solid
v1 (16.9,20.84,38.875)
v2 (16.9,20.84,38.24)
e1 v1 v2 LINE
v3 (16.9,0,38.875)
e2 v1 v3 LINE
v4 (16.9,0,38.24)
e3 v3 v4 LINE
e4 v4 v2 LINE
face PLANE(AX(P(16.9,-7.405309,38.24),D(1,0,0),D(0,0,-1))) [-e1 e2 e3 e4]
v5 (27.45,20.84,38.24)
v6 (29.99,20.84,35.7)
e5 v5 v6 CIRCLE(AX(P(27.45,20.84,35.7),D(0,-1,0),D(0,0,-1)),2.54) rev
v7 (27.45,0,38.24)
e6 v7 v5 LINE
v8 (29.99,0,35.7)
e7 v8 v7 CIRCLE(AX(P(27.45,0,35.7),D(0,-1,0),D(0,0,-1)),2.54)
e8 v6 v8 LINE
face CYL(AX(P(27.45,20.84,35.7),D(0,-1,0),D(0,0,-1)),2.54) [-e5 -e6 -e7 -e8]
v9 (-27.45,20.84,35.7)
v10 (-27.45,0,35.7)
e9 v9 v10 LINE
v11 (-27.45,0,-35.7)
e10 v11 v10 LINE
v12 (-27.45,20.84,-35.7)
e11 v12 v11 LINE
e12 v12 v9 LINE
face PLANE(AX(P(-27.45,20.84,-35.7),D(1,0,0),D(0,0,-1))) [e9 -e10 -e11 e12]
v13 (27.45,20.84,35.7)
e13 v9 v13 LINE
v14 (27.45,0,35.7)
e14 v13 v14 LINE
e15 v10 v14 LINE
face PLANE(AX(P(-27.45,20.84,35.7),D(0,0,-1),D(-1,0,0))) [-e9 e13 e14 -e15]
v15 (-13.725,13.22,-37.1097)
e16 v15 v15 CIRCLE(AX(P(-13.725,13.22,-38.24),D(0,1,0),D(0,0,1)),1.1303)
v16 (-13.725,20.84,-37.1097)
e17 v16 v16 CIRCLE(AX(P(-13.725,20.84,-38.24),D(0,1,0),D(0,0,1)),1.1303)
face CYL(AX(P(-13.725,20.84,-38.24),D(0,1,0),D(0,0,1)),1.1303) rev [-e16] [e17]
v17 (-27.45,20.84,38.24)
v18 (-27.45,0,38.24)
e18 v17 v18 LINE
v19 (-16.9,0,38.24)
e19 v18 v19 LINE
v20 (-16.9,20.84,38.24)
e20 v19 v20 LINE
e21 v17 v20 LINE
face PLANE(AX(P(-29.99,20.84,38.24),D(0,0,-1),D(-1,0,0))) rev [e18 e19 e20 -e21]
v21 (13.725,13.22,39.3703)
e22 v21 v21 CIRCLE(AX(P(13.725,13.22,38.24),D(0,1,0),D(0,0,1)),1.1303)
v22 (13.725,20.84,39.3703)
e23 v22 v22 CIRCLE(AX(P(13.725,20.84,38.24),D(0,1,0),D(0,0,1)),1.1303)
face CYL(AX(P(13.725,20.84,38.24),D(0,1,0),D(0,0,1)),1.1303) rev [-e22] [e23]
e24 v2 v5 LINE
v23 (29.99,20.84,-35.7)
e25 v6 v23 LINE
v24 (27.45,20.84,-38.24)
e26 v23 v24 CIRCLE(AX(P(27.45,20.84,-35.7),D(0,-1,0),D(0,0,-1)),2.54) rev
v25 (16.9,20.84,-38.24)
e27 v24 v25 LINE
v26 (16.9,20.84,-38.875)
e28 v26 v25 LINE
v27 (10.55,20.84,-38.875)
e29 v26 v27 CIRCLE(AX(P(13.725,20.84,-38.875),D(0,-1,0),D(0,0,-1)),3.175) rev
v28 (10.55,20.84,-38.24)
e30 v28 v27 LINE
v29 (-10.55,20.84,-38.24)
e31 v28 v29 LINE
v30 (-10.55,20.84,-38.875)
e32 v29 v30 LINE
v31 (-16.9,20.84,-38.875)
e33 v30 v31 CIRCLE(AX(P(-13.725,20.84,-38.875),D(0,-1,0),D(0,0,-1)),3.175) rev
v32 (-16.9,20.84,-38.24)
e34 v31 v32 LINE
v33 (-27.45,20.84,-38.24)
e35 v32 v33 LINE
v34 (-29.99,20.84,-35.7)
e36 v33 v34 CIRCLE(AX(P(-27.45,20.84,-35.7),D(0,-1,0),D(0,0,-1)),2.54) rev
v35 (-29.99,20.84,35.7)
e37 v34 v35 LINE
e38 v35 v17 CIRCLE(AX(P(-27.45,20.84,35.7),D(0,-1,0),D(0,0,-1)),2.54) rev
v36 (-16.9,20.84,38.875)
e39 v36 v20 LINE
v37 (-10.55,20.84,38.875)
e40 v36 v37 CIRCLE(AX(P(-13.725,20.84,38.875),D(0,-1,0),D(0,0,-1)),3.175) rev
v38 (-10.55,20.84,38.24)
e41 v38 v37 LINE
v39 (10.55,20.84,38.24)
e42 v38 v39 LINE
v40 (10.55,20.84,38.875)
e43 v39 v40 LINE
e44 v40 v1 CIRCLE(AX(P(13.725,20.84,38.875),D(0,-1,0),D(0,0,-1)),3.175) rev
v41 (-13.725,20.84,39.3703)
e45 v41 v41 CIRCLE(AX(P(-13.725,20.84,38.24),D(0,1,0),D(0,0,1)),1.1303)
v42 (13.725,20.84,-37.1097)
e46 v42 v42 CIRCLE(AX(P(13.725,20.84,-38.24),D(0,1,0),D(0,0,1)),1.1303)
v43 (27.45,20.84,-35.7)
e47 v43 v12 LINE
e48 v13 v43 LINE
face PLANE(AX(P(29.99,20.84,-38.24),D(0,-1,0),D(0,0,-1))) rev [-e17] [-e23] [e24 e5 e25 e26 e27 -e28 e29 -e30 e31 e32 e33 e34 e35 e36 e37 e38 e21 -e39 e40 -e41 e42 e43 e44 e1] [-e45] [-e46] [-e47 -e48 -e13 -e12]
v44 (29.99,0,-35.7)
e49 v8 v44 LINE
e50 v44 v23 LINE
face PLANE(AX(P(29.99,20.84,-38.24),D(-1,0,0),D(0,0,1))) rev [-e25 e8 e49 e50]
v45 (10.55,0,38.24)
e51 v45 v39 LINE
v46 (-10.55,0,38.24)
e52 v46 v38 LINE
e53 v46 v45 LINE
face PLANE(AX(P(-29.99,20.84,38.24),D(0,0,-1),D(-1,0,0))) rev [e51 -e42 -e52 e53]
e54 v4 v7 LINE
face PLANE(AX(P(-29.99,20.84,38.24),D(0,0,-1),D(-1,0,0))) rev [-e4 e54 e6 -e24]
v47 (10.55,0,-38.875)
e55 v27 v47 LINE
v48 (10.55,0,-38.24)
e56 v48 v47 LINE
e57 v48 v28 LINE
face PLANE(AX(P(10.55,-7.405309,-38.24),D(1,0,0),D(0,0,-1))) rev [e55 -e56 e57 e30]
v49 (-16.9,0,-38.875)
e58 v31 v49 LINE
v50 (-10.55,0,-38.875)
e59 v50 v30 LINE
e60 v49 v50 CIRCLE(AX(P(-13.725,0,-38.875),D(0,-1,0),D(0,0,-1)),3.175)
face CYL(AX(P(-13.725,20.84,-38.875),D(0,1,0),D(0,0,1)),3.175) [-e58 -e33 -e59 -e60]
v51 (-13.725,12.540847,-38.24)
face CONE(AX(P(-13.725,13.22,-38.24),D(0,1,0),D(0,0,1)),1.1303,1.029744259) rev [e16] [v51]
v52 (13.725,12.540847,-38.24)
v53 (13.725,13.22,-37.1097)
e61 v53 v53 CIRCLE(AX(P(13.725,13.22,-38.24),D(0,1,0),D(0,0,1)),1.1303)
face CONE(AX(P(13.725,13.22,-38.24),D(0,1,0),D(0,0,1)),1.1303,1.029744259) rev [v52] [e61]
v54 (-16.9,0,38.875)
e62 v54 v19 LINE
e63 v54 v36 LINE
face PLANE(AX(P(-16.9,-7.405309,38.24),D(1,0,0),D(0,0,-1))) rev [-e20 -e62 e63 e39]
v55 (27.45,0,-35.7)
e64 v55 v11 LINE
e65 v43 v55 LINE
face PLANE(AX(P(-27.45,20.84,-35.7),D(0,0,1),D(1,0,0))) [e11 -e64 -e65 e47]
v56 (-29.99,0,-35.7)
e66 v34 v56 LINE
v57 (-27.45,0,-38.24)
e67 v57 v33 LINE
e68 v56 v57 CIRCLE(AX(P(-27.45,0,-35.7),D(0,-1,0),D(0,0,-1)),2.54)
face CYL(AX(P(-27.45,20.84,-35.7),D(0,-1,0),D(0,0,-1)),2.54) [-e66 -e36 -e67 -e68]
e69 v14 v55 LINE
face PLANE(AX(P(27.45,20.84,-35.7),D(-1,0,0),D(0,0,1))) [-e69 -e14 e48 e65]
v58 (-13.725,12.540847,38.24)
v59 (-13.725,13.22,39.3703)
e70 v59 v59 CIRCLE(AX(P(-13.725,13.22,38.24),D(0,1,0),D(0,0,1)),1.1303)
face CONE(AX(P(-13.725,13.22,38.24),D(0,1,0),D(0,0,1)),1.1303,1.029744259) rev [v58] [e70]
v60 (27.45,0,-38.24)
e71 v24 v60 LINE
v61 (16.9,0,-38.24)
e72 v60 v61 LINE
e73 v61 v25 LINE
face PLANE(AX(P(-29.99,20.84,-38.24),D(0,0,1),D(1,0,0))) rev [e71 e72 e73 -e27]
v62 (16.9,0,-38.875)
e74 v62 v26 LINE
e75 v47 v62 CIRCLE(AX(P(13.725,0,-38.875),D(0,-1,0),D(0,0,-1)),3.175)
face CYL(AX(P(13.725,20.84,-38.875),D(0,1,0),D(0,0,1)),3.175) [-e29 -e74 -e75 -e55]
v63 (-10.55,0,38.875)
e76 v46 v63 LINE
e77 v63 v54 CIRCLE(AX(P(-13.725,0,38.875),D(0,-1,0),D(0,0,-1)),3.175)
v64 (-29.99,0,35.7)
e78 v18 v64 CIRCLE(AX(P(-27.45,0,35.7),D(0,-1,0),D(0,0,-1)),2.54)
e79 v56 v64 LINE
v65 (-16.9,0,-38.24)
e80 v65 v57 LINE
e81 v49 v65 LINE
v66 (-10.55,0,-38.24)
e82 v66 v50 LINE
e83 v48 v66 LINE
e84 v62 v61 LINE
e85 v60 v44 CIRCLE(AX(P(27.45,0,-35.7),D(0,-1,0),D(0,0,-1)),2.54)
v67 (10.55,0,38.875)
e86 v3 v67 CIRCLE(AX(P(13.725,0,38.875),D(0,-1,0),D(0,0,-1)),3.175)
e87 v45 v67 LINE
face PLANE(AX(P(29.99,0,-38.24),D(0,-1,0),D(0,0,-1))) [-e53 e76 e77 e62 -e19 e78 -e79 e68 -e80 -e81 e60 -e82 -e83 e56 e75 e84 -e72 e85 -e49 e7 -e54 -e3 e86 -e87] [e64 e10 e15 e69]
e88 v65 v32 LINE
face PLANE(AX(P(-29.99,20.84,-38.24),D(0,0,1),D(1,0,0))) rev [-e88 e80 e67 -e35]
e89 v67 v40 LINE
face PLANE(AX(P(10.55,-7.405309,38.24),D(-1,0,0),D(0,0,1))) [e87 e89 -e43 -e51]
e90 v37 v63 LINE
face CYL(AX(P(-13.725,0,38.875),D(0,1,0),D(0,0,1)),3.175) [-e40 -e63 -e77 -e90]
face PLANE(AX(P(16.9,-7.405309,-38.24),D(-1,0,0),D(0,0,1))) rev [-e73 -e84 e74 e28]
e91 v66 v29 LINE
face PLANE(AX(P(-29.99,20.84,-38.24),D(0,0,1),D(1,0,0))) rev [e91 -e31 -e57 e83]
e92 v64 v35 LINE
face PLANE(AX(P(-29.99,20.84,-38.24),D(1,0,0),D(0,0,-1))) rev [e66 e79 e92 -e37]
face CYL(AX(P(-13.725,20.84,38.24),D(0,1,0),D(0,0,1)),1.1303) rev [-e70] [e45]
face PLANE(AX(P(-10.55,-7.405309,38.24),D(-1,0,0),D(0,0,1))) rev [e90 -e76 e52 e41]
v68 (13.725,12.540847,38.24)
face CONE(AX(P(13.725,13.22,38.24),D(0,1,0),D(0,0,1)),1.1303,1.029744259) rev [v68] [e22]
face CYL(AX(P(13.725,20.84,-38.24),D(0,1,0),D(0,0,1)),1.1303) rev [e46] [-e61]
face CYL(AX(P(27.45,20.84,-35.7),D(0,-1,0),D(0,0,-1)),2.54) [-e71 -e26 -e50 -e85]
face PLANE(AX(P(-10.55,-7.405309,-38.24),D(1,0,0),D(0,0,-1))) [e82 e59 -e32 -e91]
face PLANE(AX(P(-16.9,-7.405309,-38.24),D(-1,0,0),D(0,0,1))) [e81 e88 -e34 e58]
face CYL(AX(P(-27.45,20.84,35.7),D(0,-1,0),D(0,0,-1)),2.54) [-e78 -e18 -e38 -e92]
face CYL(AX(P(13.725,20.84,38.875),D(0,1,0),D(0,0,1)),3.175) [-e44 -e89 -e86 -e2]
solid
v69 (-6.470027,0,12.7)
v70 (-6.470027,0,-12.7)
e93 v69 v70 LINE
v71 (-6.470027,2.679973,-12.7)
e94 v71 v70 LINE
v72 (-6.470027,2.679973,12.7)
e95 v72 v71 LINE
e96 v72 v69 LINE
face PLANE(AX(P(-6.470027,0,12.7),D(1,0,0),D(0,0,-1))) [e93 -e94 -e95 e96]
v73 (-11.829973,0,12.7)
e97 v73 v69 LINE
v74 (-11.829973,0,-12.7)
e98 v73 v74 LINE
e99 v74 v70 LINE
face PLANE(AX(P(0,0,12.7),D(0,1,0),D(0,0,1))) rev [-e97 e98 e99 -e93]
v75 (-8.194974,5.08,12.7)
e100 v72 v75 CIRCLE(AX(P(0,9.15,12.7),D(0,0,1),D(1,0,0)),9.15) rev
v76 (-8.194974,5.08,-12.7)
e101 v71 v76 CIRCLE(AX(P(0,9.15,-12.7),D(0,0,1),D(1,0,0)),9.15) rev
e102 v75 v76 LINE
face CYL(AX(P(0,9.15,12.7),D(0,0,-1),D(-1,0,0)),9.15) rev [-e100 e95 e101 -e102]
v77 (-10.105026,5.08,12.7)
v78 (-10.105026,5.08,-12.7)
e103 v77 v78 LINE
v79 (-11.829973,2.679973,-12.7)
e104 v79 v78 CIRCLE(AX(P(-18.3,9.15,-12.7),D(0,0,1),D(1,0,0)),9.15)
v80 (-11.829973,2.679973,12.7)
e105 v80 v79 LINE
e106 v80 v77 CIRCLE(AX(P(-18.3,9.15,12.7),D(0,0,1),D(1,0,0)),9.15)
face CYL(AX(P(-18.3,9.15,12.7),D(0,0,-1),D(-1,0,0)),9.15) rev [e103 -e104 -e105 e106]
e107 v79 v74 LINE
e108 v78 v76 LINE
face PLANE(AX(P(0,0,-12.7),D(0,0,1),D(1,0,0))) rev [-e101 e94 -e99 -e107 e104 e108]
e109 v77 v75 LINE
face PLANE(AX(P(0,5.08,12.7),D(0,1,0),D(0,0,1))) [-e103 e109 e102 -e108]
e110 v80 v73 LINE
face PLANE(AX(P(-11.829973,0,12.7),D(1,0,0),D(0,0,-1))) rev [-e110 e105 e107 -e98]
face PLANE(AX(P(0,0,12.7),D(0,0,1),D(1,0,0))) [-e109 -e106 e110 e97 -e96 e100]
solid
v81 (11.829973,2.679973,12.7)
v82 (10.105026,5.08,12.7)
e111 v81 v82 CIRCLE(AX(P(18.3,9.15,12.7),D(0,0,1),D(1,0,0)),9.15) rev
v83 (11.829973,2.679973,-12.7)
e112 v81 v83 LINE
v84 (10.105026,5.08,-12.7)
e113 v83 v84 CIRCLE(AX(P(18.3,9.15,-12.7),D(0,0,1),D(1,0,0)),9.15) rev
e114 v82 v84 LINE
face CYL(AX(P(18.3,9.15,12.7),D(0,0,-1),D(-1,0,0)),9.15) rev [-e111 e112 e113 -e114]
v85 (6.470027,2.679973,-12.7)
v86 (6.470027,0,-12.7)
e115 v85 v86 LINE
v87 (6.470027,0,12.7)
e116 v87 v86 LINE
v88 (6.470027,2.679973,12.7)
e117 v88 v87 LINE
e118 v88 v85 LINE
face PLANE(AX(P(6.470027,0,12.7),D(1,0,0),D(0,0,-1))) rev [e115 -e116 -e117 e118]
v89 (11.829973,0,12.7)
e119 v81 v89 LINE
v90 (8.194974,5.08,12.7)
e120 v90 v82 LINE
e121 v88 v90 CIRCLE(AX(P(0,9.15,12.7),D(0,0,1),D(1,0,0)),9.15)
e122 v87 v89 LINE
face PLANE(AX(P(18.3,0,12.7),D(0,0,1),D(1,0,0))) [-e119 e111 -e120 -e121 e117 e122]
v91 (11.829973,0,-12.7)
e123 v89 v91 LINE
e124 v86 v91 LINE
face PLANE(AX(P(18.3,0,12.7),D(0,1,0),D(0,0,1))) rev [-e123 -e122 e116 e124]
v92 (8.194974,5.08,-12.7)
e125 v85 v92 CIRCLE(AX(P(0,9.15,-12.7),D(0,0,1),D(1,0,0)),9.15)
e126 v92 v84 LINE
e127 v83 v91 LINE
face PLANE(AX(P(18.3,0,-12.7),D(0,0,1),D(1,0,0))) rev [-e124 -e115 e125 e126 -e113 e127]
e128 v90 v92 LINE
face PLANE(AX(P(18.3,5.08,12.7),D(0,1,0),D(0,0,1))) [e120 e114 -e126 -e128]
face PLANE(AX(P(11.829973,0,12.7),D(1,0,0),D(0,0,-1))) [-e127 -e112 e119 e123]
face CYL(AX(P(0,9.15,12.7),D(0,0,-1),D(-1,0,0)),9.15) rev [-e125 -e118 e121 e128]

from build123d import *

# Parameters (mm, degrees)
BOSS_EXTRUDE1_OUTLINE_W        = 59.98
BOSS_EXTRUDE1_OUTLINE_H        = 76.48
BOSS_EXTRUDE1_OUTLINE_W_2      = 54.9
BOSS_EXTRUDE1_OUTLINE_H_2      = 71.4
BOSS_EXTRUDE1_DEPTH            = 20.839999976
BOSS_EXTRUDE2_DEPTH            = 12.7
LPATTERN2_COUNT                = 2
LPATTERN2_PITCH                = 18.3
SKETCH6_W                      = 6.35
SKETCH6_H                      = 3.81
BOSS_EXTRUDE3_DEPTH            = 20.839999976
MIRROR2_COPY_1_SKETCH_W        = 6.35
MIRROR2_COPY_1_SKETCH_H        = 3.81
MIRROR2_COPY_1_DEPTH           = 20.839999976
F_4_40_TAPPED_HOLE1_AT_2_COUNT = 2
F_4_40_TAPPED_HOLE1_AT_2_PITCH = 27.45
F_4_40_TAPPED_HOLE1_AT_3_COUNT = 2
F_4_40_TAPPED_HOLE1_AT_3_PITCH = 81.25695601
F_4_40_TAPPED_HOLE1_AT_4_COUNT = 2
F_4_40_TAPPED_HOLE1_AT_4_PITCH = 76.48
FILLET1_RADIUS                 = 3.175
FILLET1_LENGTH                 = 20.839999976
FILLET2_RADIUS                 = 3.175
FILLET2_LENGTH                 = 20.839999976
FILLET3_RADIUS                 = 3.175
FILLET3_LENGTH                 = 20.839999976
FILLET4_RADIUS                 = 3.175
FILLET4_LENGTH                 = 20.839999976
FILLET5_R                      = 2.54


# Read off the part's stored shape, not the designer's step: Boss-Extrude1
with BuildPart() as part:
    # Boss-Extrude1 outline → Boss-Extrude1 (new body)
    with BuildSketch(Plane(origin=(0, 0, 0), x_dir=(1, 0, 0), z_dir=(0, 1, 0))):
        Rectangle(BOSS_EXTRUDE1_OUTLINE_W, BOSS_EXTRUDE1_OUTLINE_H)
        Rectangle(BOSS_EXTRUDE1_OUTLINE_W_2, BOSS_EXTRUDE1_OUTLINE_H_2, mode=Mode.SUBTRACT)
    extrude(amount=BOSS_EXTRUDE1_DEPTH)

    # Sketch6 → Boss-Extrude3 (add)
    with BuildSketch(Plane(origin=(0, 20.839999976, 0), x_dir=(1, 0, 0), z_dir=(0, 1, 0))):
        with Locations((-13.725, 40.145)):
            Rectangle(SKETCH6_W, SKETCH6_H)
    boss_extrude3 = extrude(amount=-BOSS_EXTRUDE3_DEPTH)

    # Mirror1: Boss-Extrude3 across plane
    add(boss_extrude3.mirror(Plane(origin=(0, 0, 0), x_dir=(0, 0, 1), z_dir=(1, 0, 0))))

    # Mirror2: Boss-Extrude3 across plane
    add(boss_extrude3.mirror(Plane.XY))

    # Mirror2 copy 1 sketch → Mirror2 copy 1 (add)
    with BuildSketch(Plane(origin=(0, 20.839999976, 0), x_dir=(-1, 0, 0), z_dir=(0, 1, 0))):
        with Locations((-13.725, 40.145)):
            Rectangle(MIRROR2_COPY_1_SKETCH_W, MIRROR2_COPY_1_SKETCH_H)
    extrude(amount=-MIRROR2_COPY_1_DEPTH)

    # Sketch7 → #4-40 Tapped Hole1 (revolve, cut)
    with BuildSketch(Plane(origin=(-13.725, 20.839999976, -38.24), x_dir=(0, 0, 1), z_dir=(1, 0, 0))):
        Polygon((0, 0), (0, 8.299152758), (1.1303, 7.62), (1.1303, 0), align=None)
    f_4_40_tapped_hole1 = revolve(axis=Axis((-13.725, 27.189999976, -38.24), (0, -1, 0)), mode=Mode.SUBTRACT)

    # #4-40 Tapped Hole1 at 2: #4-40 Tapped Hole1 ×2
    with Locations(*[(i * F_4_40_TAPPED_HOLE1_AT_2_PITCH, 0, 0) for i in range(1, F_4_40_TAPPED_HOLE1_AT_2_COUNT)]):
        add(f_4_40_tapped_hole1, mode=Mode.SUBTRACT)

    # #4-40 Tapped Hole1 at 3: #4-40 Tapped Hole1 ×2
    with Locations(*[Vector(0.3378172324920079, 0, 0.9412117282691715) * (i * F_4_40_TAPPED_HOLE1_AT_3_PITCH) for i in range(1, F_4_40_TAPPED_HOLE1_AT_3_COUNT)]):
        add(f_4_40_tapped_hole1, mode=Mode.SUBTRACT)

    # #4-40 Tapped Hole1 at 4: #4-40 Tapped Hole1 ×2
    with Locations(*[(0, 0, i * F_4_40_TAPPED_HOLE1_AT_4_PITCH) for i in range(1, F_4_40_TAPPED_HOLE1_AT_4_COUNT)]):
        add(f_4_40_tapped_hole1, mode=Mode.SUBTRACT)

    # Fillet1: full round fillet: the end face becomes a half cylinder, R = half its width
    fillet1_face = Plane((-13.725, 10.419999988, -42.05), x_dir=(0, -1, 0), z_dir=(0, 0, -1))  # on the end face: x along it, z out of the body
    fillet1_slab = fillet1_face.offset(-FILLET1_RADIUS / 2) * Box(FILLET1_LENGTH, 2 * FILLET1_RADIUS, FILLET1_RADIUS, mode=Mode.PRIVATE)  # the body's end, R deep
    fillet1_round = Plane((-13.725, 10.419999988, -38.875), x_dir=(0, 0, -1), z_dir=(0, -1, 0)) * Cylinder(FILLET1_RADIUS, FILLET1_LENGTH, mode=Mode.PRIVATE)  # its axis R under the face
    add(fillet1_slab - fillet1_round, mode=Mode.SUBTRACT)

    # Fillet2: full round fillet: the end face becomes a half cylinder, R = half its width
    fillet2_face = Plane((13.725, 10.419999988, -42.05), x_dir=(0, -1, 0), z_dir=(0, 0, -1))  # on the end face: x along it, z out of the body
    fillet2_slab = fillet2_face.offset(-FILLET2_RADIUS / 2) * Box(FILLET2_LENGTH, 2 * FILLET2_RADIUS, FILLET2_RADIUS, mode=Mode.PRIVATE)  # the body's end, R deep
    fillet2_round = Plane((13.725, 10.419999988, -38.875), x_dir=(0, 0, -1), z_dir=(0, -1, 0)) * Cylinder(FILLET2_RADIUS, FILLET2_LENGTH, mode=Mode.PRIVATE)  # its axis R under the face
    add(fillet2_slab - fillet2_round, mode=Mode.SUBTRACT)

    # Fillet3: full round fillet: the end face becomes a half cylinder, R = half its width
    fillet3_face = Plane((13.725, 10.419999988, 42.05), x_dir=(0, -1, 0), z_dir=(0, 0, 1))  # on the end face: x along it, z out of the body
    fillet3_slab = fillet3_face.offset(-FILLET3_RADIUS / 2) * Box(FILLET3_LENGTH, 2 * FILLET3_RADIUS, FILLET3_RADIUS, mode=Mode.PRIVATE)  # the body's end, R deep
    fillet3_round = Plane((13.725, 10.419999988, 38.875), x_dir=(0, 0, 1), z_dir=(0, -1, 0)) * Cylinder(FILLET3_RADIUS, FILLET3_LENGTH, mode=Mode.PRIVATE)  # its axis R under the face
    add(fillet3_slab - fillet3_round, mode=Mode.SUBTRACT)

    # Fillet4: full round fillet: the end face becomes a half cylinder, R = half its width
    fillet4_face = Plane((-13.725, 10.419999988, 42.05), x_dir=(0, -1, 0), z_dir=(0, 0, 1))  # on the end face: x along it, z out of the body
    fillet4_slab = fillet4_face.offset(-FILLET4_RADIUS / 2) * Box(FILLET4_LENGTH, 2 * FILLET4_RADIUS, FILLET4_RADIUS, mode=Mode.PRIVATE)  # the body's end, R deep
    fillet4_round = Plane((-13.725, 10.419999988, 38.875), x_dir=(0, 0, 1), z_dir=(0, -1, 0)) * Cylinder(FILLET4_RADIUS, FILLET4_LENGTH, mode=Mode.PRIVATE)  # its axis R under the face
    add(fillet4_slab - fillet4_round, mode=Mode.SUBTRACT)

    # Fillet5
    fillet5_edges = [part.edges().sort_by_distance(p)[0] for p in [
        (29.99, 10.419999988, 38.24),
        (29.99, 10.419999988, -38.24),
        (-29.99, 10.419999988, -38.24),
        (-29.99, 10.419999988, 38.24),
    ]]
    fillet(fillet5_edges, radius=FILLET5_R)


with BuildPart() as body_2:
    # Sketch4 → Boss-Extrude2 (new, symmetric)
    with BuildSketch(Plane.XY):
        with BuildLine():
            Line((-11.829972952, 0), (-6.470027048, 0))
            Line((-6.470027048, 0), (-6.470027048, 2.679972952))
            ThreePointArc((-6.470027048, 2.679972952), (-7.430046898, 3.809877988), (-8.19497407, 5.08))
            Line((-8.19497407, 5.08), (-10.10502593, 5.08))
            ThreePointArc((-10.10502593, 5.08), (-10.869953102, 3.809877988), (-11.829972952, 2.679972952))
            Line((-11.829972952, 2.679972952), (-11.829972952, 0))
        make_face()
    extrude(amount=BOSS_EXTRUDE2_DEPTH, both=True)


with BuildPart() as lpattern2_1:
    # LPattern2: pattern copy
    add(body_2.part.moved(Location(Vector(1, 0, 0) * (1 * LPATTERN2_PITCH))))


solid = Compound([part.part, body_2.part, lpattern2_1.part])
